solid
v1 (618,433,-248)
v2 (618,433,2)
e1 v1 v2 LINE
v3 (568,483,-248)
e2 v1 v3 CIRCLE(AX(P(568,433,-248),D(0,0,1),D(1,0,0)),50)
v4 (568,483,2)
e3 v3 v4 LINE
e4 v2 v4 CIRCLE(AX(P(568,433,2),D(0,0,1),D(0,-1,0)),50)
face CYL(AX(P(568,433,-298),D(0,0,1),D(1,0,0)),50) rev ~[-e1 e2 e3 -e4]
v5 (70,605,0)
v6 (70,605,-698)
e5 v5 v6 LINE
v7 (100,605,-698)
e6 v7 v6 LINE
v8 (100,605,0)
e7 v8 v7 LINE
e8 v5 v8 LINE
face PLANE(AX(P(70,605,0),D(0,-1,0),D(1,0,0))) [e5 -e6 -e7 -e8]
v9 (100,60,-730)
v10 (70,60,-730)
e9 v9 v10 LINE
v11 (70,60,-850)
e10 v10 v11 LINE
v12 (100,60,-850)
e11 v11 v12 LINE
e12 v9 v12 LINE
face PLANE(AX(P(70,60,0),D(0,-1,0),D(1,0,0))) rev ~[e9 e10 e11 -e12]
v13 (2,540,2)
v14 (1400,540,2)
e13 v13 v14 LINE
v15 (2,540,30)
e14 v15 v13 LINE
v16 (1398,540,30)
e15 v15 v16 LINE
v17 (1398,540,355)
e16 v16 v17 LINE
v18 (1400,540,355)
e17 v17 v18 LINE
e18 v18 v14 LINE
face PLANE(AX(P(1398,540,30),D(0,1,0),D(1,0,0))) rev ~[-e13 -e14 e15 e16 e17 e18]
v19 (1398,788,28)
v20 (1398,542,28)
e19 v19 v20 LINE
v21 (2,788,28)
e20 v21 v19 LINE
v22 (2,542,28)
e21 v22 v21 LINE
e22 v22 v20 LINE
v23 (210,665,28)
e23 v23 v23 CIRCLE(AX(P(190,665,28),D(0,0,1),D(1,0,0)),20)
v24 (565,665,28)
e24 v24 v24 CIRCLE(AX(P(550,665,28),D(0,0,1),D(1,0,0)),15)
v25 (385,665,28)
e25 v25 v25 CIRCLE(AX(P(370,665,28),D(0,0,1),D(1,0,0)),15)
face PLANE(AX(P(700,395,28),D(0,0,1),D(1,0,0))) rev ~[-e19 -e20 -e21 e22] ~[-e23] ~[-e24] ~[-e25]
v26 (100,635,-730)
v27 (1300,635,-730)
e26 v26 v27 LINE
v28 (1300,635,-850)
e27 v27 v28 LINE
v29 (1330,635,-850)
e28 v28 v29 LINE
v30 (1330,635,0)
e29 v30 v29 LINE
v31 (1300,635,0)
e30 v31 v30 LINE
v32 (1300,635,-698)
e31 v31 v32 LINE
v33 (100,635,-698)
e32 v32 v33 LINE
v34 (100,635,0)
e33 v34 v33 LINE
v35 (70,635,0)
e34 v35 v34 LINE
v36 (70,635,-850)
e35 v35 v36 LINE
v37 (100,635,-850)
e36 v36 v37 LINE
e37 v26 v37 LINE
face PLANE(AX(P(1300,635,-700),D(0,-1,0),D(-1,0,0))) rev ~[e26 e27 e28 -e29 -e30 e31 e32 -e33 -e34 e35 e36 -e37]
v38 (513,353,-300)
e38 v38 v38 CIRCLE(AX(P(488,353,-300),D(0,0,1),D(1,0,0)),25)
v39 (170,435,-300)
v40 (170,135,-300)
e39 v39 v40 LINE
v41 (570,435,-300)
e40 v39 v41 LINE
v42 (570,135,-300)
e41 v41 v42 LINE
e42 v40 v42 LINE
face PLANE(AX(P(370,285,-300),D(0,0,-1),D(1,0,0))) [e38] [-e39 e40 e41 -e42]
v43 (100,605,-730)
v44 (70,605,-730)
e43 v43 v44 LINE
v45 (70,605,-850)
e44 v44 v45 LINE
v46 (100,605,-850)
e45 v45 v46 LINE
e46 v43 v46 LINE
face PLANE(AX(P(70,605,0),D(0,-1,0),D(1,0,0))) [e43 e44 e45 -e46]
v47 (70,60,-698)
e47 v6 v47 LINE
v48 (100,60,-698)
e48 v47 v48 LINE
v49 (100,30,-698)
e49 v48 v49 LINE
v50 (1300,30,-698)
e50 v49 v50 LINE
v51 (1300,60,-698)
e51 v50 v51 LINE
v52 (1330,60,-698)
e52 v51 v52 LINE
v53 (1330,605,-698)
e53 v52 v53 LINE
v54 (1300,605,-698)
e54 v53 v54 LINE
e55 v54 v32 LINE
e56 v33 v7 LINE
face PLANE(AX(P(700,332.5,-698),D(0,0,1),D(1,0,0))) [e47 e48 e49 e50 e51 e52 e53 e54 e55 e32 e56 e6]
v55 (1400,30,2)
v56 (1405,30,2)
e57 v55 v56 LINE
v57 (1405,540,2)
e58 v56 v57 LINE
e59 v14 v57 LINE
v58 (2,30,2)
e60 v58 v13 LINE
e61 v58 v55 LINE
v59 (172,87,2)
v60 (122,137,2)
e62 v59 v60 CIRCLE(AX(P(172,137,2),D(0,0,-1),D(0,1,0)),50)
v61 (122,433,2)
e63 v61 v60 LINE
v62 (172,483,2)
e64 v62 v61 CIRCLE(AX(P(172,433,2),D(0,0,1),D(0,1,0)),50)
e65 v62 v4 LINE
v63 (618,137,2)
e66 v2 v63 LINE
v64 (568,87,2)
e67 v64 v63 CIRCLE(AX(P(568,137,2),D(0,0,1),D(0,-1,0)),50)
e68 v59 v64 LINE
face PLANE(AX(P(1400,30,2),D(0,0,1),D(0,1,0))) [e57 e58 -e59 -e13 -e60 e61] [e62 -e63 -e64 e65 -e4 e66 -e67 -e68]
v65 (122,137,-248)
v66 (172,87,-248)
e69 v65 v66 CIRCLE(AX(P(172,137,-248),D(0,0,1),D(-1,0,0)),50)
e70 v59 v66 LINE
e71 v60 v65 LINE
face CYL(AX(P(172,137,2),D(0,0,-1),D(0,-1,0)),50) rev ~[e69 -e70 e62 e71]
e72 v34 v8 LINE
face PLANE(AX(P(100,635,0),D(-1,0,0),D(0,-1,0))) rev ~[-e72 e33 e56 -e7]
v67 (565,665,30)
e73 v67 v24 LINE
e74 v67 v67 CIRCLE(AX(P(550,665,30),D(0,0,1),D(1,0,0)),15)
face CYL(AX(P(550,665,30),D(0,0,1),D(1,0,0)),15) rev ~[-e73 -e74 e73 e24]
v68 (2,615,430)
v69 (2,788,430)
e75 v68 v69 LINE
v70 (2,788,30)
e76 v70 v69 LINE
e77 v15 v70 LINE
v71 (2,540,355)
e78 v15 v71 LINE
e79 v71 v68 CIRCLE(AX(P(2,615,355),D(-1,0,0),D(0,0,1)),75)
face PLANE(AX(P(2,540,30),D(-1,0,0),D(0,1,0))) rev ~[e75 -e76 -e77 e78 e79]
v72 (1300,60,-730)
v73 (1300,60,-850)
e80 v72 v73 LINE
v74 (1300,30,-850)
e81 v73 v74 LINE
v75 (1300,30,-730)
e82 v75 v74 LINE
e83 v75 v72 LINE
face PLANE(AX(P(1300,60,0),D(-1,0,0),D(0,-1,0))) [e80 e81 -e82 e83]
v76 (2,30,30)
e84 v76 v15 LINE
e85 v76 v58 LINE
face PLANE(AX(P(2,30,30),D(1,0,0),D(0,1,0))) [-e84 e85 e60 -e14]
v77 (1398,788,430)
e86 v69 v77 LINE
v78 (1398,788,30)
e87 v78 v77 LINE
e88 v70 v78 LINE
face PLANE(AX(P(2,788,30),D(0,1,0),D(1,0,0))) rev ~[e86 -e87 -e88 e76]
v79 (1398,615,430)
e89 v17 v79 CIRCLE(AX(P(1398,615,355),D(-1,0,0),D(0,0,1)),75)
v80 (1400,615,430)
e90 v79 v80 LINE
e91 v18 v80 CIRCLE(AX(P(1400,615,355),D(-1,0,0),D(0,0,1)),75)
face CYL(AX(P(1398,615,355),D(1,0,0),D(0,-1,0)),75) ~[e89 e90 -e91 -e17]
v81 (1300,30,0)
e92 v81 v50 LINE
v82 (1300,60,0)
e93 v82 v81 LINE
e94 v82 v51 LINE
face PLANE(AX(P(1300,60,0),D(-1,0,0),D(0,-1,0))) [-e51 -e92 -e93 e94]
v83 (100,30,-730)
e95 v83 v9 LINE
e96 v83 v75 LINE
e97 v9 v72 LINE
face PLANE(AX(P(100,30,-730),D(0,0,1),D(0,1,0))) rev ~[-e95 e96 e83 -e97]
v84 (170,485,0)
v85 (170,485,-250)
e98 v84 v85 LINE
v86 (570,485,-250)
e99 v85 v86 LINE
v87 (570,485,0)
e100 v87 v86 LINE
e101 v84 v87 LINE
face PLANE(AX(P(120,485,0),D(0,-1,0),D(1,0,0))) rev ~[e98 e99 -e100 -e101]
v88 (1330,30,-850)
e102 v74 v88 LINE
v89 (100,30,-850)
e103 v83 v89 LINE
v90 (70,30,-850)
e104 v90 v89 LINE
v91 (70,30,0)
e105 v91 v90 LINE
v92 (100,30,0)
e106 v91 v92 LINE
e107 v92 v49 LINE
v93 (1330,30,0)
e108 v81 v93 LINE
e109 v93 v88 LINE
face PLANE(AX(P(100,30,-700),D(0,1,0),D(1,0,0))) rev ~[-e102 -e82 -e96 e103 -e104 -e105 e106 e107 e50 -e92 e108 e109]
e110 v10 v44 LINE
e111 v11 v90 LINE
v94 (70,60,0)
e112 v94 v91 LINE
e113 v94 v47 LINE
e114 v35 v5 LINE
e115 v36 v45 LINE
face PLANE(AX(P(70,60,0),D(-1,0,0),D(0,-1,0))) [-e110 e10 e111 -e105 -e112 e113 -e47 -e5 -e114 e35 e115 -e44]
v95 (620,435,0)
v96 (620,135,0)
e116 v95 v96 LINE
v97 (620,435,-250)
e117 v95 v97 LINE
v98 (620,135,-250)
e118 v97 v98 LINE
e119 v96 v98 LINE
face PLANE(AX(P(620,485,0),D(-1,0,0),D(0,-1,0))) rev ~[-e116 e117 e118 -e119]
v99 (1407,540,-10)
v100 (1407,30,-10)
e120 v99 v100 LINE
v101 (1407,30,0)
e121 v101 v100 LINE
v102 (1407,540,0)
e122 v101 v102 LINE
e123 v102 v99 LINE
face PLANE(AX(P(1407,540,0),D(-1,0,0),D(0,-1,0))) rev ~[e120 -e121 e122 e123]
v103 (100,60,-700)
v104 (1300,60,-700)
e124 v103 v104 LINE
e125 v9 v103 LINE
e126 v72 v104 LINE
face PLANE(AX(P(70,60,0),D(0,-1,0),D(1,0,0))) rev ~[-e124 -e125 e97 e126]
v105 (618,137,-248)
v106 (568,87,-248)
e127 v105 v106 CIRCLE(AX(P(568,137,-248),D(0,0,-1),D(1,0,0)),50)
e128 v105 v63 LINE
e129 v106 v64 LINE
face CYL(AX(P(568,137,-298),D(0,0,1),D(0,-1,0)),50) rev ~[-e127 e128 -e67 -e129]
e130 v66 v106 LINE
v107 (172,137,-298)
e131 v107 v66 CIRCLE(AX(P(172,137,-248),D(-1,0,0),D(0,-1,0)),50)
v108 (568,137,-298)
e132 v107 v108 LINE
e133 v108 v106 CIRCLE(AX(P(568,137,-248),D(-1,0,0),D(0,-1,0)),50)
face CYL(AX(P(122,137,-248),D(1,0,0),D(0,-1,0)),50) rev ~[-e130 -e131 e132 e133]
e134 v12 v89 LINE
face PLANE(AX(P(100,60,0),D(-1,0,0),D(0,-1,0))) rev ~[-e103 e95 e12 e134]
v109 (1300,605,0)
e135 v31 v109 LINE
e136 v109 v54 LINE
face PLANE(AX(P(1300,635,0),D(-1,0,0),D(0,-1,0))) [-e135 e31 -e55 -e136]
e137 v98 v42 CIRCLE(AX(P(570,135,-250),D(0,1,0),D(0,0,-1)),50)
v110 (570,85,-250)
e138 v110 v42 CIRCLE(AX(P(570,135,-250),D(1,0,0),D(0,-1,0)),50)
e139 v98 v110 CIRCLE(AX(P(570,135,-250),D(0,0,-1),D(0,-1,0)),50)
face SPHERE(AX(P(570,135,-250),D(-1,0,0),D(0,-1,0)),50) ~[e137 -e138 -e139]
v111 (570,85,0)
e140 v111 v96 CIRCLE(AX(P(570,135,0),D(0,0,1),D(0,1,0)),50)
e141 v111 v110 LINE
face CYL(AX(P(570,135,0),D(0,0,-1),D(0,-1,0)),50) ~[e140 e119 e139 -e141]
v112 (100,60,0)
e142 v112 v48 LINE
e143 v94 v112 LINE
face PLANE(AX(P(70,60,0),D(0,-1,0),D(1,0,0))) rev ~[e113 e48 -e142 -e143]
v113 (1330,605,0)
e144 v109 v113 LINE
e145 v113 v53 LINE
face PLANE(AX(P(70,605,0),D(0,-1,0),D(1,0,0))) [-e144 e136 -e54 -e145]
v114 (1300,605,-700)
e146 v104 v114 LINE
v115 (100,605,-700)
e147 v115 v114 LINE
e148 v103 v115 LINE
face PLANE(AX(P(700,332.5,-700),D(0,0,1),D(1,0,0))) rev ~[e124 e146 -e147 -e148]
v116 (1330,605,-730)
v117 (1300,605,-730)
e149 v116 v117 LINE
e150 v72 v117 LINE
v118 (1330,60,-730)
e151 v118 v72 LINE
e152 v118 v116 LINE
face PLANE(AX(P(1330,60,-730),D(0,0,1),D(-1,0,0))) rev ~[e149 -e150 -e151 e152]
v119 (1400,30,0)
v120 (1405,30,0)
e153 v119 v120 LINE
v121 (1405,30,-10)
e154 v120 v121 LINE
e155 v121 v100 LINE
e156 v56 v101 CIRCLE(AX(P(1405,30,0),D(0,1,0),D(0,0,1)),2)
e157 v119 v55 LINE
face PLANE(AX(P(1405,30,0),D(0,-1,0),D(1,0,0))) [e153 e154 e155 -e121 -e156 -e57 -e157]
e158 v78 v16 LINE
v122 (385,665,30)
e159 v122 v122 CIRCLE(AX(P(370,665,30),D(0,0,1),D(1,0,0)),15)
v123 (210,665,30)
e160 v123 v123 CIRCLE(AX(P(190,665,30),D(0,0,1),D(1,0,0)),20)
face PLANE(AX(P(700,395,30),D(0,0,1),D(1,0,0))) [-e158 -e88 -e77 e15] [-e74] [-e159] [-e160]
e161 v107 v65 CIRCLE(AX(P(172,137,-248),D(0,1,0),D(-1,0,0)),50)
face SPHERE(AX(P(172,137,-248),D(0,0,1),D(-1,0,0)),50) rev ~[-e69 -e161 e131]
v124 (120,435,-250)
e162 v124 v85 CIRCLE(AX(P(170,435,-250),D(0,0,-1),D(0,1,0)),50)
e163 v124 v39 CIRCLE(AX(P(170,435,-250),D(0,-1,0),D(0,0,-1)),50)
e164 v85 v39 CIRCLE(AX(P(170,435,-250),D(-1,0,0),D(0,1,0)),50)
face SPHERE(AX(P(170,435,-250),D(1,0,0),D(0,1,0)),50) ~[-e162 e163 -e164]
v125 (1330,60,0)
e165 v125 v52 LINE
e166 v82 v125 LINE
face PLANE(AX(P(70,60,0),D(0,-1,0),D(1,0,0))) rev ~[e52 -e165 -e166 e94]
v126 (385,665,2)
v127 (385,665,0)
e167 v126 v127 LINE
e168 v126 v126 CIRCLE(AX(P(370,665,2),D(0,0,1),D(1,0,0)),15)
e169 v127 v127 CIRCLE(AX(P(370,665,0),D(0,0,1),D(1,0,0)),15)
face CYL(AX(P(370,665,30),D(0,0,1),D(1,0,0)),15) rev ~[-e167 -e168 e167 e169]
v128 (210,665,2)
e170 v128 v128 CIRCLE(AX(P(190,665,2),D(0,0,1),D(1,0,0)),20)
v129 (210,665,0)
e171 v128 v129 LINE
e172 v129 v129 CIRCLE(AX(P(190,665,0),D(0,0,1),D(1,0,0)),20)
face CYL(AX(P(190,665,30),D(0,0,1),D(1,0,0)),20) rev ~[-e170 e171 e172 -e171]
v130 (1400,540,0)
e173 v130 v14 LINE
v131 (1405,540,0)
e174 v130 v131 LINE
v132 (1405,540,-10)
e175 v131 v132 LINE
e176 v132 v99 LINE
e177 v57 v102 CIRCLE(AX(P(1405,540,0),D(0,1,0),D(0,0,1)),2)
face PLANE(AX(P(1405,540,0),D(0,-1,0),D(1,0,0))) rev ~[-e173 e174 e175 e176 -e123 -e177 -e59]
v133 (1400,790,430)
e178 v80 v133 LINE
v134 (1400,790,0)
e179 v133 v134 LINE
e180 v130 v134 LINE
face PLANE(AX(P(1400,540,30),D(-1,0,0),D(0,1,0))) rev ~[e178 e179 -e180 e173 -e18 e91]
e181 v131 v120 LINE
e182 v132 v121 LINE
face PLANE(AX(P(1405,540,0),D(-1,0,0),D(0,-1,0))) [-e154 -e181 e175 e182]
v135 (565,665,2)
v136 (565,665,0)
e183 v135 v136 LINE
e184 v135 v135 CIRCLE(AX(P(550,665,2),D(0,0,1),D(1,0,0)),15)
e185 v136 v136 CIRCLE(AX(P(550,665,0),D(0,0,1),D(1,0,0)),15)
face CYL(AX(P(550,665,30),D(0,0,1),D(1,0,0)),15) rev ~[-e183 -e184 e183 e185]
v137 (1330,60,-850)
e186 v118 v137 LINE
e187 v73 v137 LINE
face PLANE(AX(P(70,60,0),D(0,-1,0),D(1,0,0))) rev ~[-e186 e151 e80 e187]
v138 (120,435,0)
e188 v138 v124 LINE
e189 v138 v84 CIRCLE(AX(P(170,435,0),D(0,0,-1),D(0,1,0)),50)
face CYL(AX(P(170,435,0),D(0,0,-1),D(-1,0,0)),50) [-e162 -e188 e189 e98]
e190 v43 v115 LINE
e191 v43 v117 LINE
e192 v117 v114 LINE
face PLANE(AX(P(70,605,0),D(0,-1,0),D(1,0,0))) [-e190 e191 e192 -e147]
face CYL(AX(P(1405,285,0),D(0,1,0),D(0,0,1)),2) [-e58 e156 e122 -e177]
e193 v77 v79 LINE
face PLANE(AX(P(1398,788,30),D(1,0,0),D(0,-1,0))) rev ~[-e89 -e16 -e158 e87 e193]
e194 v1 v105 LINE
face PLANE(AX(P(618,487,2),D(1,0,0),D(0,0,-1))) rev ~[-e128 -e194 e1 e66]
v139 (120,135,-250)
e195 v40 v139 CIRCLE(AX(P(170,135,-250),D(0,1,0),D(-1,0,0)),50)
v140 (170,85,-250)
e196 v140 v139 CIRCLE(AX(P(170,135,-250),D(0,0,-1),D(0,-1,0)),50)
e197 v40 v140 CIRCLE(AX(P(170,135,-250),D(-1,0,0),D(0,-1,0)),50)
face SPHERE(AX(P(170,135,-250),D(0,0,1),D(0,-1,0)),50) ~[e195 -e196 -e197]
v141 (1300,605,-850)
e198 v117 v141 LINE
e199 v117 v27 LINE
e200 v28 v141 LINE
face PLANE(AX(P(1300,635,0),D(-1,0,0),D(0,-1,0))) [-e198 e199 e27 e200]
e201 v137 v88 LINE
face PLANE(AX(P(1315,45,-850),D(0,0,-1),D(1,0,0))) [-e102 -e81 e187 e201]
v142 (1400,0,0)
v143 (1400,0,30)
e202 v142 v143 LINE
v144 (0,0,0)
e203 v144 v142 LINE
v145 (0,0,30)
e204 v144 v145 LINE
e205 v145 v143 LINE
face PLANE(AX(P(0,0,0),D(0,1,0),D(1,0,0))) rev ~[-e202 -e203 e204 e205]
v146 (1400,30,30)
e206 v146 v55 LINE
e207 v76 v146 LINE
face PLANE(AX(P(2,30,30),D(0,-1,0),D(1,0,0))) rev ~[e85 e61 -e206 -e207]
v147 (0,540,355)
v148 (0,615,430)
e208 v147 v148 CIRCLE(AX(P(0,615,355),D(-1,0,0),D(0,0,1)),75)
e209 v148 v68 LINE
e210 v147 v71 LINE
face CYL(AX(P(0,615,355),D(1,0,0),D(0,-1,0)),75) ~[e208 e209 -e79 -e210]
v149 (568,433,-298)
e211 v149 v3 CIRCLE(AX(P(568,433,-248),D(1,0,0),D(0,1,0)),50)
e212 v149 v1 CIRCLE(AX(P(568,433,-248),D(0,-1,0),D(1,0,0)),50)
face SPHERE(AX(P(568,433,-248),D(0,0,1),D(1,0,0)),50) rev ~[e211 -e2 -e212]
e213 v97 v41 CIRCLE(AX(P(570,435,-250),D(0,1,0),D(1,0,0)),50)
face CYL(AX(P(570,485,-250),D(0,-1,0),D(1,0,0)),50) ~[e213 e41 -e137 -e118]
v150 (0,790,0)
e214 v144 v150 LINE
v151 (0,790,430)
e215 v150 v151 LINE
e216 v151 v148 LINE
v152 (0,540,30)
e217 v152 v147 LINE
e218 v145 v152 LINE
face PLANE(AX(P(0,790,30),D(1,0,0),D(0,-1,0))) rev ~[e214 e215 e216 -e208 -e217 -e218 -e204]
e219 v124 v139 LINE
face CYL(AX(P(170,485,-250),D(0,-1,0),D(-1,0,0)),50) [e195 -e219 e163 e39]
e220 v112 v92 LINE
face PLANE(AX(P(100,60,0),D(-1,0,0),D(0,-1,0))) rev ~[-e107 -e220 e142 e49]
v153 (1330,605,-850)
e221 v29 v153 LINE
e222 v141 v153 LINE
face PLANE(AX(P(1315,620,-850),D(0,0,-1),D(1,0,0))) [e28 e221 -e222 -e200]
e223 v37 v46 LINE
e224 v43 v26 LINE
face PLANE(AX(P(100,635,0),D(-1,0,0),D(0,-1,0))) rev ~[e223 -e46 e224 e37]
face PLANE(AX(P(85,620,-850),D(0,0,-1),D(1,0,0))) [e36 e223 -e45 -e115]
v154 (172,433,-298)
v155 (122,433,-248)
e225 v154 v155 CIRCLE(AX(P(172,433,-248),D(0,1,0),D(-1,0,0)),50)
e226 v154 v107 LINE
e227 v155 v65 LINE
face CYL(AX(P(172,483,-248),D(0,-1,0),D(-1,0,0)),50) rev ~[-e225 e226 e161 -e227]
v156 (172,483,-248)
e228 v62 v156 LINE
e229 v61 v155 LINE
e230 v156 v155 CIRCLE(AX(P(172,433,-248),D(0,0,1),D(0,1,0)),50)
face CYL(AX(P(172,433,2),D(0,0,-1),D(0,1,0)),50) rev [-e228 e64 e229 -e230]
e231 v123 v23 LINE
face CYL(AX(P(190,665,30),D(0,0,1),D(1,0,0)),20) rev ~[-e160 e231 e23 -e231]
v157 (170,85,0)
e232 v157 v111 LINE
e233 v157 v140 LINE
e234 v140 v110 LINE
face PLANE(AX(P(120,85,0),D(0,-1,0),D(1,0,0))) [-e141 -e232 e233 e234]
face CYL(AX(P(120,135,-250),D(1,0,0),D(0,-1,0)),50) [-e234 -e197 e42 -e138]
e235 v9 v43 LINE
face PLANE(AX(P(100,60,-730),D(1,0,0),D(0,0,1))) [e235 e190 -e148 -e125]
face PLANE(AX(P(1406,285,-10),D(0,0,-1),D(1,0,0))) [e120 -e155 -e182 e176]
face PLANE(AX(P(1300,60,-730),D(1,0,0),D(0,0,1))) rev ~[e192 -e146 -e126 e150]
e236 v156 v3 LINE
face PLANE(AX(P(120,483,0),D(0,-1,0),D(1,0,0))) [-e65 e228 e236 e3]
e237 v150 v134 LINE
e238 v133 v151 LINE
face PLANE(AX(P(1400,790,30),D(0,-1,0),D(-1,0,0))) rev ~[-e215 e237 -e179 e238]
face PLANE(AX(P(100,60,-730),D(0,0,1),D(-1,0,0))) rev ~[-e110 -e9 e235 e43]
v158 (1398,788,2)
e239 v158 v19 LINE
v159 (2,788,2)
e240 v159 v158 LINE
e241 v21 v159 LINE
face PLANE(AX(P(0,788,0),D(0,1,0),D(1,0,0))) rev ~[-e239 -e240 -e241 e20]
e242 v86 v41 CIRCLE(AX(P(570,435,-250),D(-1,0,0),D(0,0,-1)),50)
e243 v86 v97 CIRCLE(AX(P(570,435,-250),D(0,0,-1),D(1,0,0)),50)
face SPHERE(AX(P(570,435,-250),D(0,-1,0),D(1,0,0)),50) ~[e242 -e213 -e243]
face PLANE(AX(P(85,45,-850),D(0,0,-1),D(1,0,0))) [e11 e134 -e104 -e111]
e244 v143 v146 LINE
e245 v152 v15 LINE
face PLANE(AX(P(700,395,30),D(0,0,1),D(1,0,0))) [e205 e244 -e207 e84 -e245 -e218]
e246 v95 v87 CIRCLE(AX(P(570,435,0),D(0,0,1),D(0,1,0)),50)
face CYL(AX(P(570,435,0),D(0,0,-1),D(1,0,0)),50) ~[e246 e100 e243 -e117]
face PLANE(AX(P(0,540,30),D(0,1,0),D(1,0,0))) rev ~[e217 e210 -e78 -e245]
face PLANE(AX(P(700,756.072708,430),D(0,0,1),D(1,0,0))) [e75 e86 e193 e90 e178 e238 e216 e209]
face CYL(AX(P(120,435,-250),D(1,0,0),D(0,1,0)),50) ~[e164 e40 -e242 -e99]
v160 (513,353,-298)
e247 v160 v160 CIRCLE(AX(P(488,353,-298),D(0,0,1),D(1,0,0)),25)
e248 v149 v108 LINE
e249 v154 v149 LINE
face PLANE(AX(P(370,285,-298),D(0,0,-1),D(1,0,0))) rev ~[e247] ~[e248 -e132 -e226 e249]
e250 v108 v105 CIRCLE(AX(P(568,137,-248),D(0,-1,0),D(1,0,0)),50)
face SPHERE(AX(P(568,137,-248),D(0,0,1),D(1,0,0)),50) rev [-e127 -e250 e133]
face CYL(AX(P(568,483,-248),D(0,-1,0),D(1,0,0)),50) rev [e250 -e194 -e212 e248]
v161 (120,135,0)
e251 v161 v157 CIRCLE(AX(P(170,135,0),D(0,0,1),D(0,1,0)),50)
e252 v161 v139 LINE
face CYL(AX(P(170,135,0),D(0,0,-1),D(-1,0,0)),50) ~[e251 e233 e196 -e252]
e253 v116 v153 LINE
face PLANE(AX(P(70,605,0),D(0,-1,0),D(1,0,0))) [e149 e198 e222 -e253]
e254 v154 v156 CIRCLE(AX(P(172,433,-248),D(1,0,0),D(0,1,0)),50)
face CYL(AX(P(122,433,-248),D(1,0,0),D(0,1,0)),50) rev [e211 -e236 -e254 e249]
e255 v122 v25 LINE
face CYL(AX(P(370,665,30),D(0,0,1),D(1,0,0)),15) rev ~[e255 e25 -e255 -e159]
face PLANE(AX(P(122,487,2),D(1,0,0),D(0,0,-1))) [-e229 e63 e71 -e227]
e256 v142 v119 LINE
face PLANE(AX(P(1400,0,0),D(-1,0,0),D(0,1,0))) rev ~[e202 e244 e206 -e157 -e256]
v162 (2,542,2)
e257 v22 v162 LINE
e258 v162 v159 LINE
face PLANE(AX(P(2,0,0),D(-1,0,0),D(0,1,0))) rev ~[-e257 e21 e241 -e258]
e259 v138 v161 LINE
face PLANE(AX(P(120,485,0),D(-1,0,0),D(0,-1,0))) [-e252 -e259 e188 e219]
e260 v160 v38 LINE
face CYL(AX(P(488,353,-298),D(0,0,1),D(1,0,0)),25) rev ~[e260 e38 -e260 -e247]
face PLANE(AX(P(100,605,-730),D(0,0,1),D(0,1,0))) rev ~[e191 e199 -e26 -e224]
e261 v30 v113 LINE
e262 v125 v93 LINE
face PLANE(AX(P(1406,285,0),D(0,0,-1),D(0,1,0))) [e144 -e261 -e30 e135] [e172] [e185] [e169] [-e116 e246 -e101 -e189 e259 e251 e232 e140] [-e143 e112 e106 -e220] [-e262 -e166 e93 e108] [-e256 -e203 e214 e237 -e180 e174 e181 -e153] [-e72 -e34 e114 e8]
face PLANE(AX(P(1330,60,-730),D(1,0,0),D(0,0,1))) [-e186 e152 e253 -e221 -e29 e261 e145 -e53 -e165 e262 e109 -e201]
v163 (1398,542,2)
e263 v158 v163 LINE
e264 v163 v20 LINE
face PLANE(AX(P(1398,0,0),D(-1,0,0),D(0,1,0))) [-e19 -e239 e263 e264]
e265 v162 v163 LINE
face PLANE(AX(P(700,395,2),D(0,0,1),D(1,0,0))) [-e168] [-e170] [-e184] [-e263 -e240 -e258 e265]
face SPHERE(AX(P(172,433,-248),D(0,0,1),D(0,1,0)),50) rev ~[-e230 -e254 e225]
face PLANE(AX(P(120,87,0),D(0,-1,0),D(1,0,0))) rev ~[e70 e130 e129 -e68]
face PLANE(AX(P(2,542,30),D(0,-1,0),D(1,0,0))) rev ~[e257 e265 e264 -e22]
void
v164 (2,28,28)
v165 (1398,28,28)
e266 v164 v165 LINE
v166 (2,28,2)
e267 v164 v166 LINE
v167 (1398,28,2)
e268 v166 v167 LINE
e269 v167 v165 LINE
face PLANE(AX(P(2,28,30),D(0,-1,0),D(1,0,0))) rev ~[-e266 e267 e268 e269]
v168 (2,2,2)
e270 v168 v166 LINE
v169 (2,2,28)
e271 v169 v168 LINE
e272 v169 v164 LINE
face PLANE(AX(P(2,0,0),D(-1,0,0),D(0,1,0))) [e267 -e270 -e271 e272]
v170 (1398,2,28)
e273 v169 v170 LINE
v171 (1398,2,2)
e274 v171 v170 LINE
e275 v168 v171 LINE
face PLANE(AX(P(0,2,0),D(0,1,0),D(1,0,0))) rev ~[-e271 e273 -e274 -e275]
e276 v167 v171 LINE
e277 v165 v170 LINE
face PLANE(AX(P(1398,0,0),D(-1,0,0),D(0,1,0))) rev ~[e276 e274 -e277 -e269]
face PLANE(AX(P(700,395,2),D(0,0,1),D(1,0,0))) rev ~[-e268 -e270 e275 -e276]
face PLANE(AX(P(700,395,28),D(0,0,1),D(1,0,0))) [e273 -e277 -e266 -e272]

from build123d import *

# Parameters (mm, degrees)
F0_W        = 1400
F0_H        = 790
F1_DEPTH    = 30
F2_W        = 1398
F2_H        = 510
F3_DEPTH    = 28
F4_W        = 500
F4_H        = 400
F5_DEPTH    = 300
F6_T        = 2
F6_T3_DEPTH = 404
F6_T5_DEPTH = 504
F6_T7_DEPTH = 32
F7_R        = 50
F8_R        = 25
F9_DEPTH    = 2
F10_R       = 15
F10_R_2     = 20
F11_DEPTH   = 30
F12_W       = 510
F12_H       = 2
F13_DEPTH   = 5
F14_W       = 510
F14_H       = 2
F15_ANGLE   = 90
F16_W       = 2
F16_H       = 510
F17_DEPTH   = 10
F18_W       = 30
F18_H       = 30
F19_DEPTH   = 850
F20_W       = 30
F20_H       = 30
F21_DEPTH   = 1200
F22_W       = 30
F22_H       = 30
F23_DEPTH   = 545
F25_DEPTH   = 2
F27_DEPTH   = 400
F28_R       = 75


# Not quite as in the source:
# - a shell that OpenCascade refuses in one call is made with other operations: the cavity is built on its own and cut out


with BuildPart() as f1:
    # F0 (on Top) → F1 (new body)
    with BuildSketch(Plane.XY):
        with Locations((700, 395)):
            Rectangle(F0_W, F0_H)
    extrude(amount=F1_DEPTH)

    # F2 (on face) → F3 (cut)
    with BuildSketch(Plane.XY.offset(30)):
        with Locations((701, 285)):
            Rectangle(F2_W, F2_H)
    extrude(amount=-F3_DEPTH, mode=Mode.SUBTRACT)

    # F4 (on face) → F5 (join)
    with BuildSketch(Plane(origin=(0, 0, 0), x_dir=(1, 0, 0), z_dir=(0, 0, -1))):
        with Locations((370, -285)):
            Rectangle(F4_W, F4_H)
    extrude(amount=F5_DEPTH)

    # F6: shell of thickness 2, made by hand


with BuildPart() as f6_core1:
    # F6_t2: copy of F1
    add(f1.part)

    # the walls: a layer under each face that stays
    f6_faces = [f6_core1.faces().sort_by_distance(p)[0] for p in [
        (0, 395, 15),
        (700, 790, 15),
        (700, 0, 15),
        (700, 395, 0),
        (233.3333333333, 658.3333333333, 30),
        (1400, 658.3333333333, 25),
        (620, 285, -150),
        (370, 485, -150),
        (120, 285, -150),
        (370, 85, -150),
        (701, 540, 16),
        (2, 285, 16),
        (701, 30, 16),
        (370, 285, -300),
    ]]
    thicken(f6_faces, amount=-F6_T, mode=Mode.SUBTRACT)

    # F6_s4 → F6_t3 (cut)
    with BuildSketch(Plane.XZ.offset(-487)):
        Polygon((620.02, -0.02), (620, 2), (618, 2), (618, 0), align=None)
        Polygon((119.98, -0.02), (120, 2), (122, 2), (122, 0), align=None)
    extrude(amount=F6_T3_DEPTH, mode=Mode.SUBTRACT)

    # F6_s6 → F6_t5 (cut)
    with BuildSketch(Plane.YZ.offset(118)):
        Polygon((485.02, -0.02), (485, 2), (483, 2), (483, 0), align=None)
        Polygon((84.98, -0.02), (85, 2), (87, 2), (87, 0), align=None)
    extrude(amount=F6_T5_DEPTH, mode=Mode.SUBTRACT)

    # F6_s8 → F6_t7 (cut)
    with BuildSketch(Plane.XY):
        Polygon((2.02, 539.98), (2, 542), (0, 542), (0, 540), align=None)
        Polygon((2.02, 30.02), (0, 30), (0, 28), (2, 28), align=None)
    extrude(amount=F6_T7_DEPTH, mode=Mode.SUBTRACT)


with BuildPart() as f1_1:
    add(f1.part)

    # what is left inside the walls is the cavity
    f6_cavity = [f6_core1.part.solids().sort_by_distance(p)[0] for p in [
        (700, 10.666667, 2.02),
        (700, 624, 27.98),
        (370, 351, -297.98),
    ]]
    add(f6_cavity, mode=Mode.SUBTRACT)

    # F7
    f7_edges = [f1_1.edges().sort_by_distance(p)[0] for p in [
        (122, 483, -148),
        (618, 483, -148),
        (122, 87, -148),
        (618, 87, -148),
        (618, 285, -298),
        (370, 483, -298),
        (122, 285, -298),
        (370, 87, -298),
        (120, 85, -150),
        (370, 85, -300),
        (620, 85, -150),
        (620, 285, -300),
        (620, 485, -150),
        (370, 485, -300),
        (120, 485, -150),
        (120, 285, -300),
    ]]
    fillet(f7_edges, radius=F7_R)

    # F8 (on face) → F9 (cut, through all)
    with BuildSketch(Plane.XY.offset(-298)):
        with Locations((488, 353)):
            Circle(F8_R)
    extrude(amount=-F9_DEPTH, mode=Mode.SUBTRACT)

    # F10 (on face) → F11 (cut, through all)
    with BuildSketch(Plane.XY.offset(30)):
        with Locations((550, 665)):
            Circle(F10_R)
        with Locations((370, 665)):
            Circle(F10_R)
        with Locations((190, 665)):
            Circle(F10_R_2)
    extrude(amount=-F11_DEPTH, mode=Mode.SUBTRACT)

    # F12 (on face) → F13 (join)
    with BuildSketch(Plane.YZ.offset(1400)):
        with Locations((285, 1)):
            Rectangle(F12_W, F12_H)
    extrude(amount=F13_DEPTH)

    # F14 (on face) → F15 (revolve)
    with BuildSketch(Plane.YZ.offset(1405)):
        with Locations((285, 1)):
            Rectangle(F14_W, F14_H)
    revolve(axis=Axis((1405, 285, 0), (0, 1, 0)), revolution_arc=F15_ANGLE)

    # F16 (on face) → F17 (join)
    with BuildSketch(Plane(origin=(0, 0, 0), x_dir=(1, 0, 0), z_dir=(0, 0, -1))):
        with Locations((1406, -285)):
            Rectangle(F16_W, F16_H)
    extrude(amount=F17_DEPTH)

    # F18 (on face) → F19 (join)
    with BuildSketch(Plane(origin=(0, 0, 0), x_dir=(1, 0, 0), z_dir=(0, 0, -1))):
        with Locations((85, -45)):
            Rectangle(F18_W, F18_H)
        with Locations((1315, -45)):
            Rectangle(F18_W, F18_H)
        with Locations((1315, -620)):
            Rectangle(F18_W, F18_H)
        with Locations((85, -620)):
            Rectangle(F18_W, F18_H)
    extrude(amount=F19_DEPTH)

    # F20 (on face) → F21 (join, through all)
    with BuildSketch(Plane.YZ.offset(100)):
        with Locations((45, -715)):
            Rectangle(F20_W, F20_H)
        with Locations((620, -715)):
            Rectangle(F20_W, F20_H)
    extrude(amount=F21_DEPTH)

    # F22 (on face) → F23 (join, through all)
    with BuildSketch(Plane(origin=(0, 60, 0), x_dir=(-1, 0, 0), z_dir=(0, 1, 0))):
        with Locations((-1315, -715)):
            Rectangle(F22_W, F22_H)
        with Locations((-85, -715)):
            Rectangle(F22_W, F22_H)
    extrude(amount=F23_DEPTH)

    # F24 (on face) → F25 (join)
    with BuildSketch(Plane.XY.offset(-700)):
        Polygon((100, 60), (100, 30), (1300, 30), (1300, 60), (1330, 60), (1330, 605), (1300, 605), (1300, 635), (100, 635), (100, 605), (70, 605), (70, 60), align=None)
    extrude(amount=F25_DEPTH)

    # F26 (on face) → F27 (join)
    with BuildSketch(Plane.XY.offset(30)):
        Polygon((1400, 790), (0, 790), (0, 540), (2, 540), (2, 788), (1398, 788), (1398, 540), (1400, 540), align=None)
    extrude(amount=F27_DEPTH)

    # F28
    f28_edges = [f1_1.edges().sort_by_distance(p)[0] for p in [
        (1, 540, 430),
        (1399, 540, 430),
    ]]
    fillet(f28_edges, radius=F28_R)


solid = f1_1.part
